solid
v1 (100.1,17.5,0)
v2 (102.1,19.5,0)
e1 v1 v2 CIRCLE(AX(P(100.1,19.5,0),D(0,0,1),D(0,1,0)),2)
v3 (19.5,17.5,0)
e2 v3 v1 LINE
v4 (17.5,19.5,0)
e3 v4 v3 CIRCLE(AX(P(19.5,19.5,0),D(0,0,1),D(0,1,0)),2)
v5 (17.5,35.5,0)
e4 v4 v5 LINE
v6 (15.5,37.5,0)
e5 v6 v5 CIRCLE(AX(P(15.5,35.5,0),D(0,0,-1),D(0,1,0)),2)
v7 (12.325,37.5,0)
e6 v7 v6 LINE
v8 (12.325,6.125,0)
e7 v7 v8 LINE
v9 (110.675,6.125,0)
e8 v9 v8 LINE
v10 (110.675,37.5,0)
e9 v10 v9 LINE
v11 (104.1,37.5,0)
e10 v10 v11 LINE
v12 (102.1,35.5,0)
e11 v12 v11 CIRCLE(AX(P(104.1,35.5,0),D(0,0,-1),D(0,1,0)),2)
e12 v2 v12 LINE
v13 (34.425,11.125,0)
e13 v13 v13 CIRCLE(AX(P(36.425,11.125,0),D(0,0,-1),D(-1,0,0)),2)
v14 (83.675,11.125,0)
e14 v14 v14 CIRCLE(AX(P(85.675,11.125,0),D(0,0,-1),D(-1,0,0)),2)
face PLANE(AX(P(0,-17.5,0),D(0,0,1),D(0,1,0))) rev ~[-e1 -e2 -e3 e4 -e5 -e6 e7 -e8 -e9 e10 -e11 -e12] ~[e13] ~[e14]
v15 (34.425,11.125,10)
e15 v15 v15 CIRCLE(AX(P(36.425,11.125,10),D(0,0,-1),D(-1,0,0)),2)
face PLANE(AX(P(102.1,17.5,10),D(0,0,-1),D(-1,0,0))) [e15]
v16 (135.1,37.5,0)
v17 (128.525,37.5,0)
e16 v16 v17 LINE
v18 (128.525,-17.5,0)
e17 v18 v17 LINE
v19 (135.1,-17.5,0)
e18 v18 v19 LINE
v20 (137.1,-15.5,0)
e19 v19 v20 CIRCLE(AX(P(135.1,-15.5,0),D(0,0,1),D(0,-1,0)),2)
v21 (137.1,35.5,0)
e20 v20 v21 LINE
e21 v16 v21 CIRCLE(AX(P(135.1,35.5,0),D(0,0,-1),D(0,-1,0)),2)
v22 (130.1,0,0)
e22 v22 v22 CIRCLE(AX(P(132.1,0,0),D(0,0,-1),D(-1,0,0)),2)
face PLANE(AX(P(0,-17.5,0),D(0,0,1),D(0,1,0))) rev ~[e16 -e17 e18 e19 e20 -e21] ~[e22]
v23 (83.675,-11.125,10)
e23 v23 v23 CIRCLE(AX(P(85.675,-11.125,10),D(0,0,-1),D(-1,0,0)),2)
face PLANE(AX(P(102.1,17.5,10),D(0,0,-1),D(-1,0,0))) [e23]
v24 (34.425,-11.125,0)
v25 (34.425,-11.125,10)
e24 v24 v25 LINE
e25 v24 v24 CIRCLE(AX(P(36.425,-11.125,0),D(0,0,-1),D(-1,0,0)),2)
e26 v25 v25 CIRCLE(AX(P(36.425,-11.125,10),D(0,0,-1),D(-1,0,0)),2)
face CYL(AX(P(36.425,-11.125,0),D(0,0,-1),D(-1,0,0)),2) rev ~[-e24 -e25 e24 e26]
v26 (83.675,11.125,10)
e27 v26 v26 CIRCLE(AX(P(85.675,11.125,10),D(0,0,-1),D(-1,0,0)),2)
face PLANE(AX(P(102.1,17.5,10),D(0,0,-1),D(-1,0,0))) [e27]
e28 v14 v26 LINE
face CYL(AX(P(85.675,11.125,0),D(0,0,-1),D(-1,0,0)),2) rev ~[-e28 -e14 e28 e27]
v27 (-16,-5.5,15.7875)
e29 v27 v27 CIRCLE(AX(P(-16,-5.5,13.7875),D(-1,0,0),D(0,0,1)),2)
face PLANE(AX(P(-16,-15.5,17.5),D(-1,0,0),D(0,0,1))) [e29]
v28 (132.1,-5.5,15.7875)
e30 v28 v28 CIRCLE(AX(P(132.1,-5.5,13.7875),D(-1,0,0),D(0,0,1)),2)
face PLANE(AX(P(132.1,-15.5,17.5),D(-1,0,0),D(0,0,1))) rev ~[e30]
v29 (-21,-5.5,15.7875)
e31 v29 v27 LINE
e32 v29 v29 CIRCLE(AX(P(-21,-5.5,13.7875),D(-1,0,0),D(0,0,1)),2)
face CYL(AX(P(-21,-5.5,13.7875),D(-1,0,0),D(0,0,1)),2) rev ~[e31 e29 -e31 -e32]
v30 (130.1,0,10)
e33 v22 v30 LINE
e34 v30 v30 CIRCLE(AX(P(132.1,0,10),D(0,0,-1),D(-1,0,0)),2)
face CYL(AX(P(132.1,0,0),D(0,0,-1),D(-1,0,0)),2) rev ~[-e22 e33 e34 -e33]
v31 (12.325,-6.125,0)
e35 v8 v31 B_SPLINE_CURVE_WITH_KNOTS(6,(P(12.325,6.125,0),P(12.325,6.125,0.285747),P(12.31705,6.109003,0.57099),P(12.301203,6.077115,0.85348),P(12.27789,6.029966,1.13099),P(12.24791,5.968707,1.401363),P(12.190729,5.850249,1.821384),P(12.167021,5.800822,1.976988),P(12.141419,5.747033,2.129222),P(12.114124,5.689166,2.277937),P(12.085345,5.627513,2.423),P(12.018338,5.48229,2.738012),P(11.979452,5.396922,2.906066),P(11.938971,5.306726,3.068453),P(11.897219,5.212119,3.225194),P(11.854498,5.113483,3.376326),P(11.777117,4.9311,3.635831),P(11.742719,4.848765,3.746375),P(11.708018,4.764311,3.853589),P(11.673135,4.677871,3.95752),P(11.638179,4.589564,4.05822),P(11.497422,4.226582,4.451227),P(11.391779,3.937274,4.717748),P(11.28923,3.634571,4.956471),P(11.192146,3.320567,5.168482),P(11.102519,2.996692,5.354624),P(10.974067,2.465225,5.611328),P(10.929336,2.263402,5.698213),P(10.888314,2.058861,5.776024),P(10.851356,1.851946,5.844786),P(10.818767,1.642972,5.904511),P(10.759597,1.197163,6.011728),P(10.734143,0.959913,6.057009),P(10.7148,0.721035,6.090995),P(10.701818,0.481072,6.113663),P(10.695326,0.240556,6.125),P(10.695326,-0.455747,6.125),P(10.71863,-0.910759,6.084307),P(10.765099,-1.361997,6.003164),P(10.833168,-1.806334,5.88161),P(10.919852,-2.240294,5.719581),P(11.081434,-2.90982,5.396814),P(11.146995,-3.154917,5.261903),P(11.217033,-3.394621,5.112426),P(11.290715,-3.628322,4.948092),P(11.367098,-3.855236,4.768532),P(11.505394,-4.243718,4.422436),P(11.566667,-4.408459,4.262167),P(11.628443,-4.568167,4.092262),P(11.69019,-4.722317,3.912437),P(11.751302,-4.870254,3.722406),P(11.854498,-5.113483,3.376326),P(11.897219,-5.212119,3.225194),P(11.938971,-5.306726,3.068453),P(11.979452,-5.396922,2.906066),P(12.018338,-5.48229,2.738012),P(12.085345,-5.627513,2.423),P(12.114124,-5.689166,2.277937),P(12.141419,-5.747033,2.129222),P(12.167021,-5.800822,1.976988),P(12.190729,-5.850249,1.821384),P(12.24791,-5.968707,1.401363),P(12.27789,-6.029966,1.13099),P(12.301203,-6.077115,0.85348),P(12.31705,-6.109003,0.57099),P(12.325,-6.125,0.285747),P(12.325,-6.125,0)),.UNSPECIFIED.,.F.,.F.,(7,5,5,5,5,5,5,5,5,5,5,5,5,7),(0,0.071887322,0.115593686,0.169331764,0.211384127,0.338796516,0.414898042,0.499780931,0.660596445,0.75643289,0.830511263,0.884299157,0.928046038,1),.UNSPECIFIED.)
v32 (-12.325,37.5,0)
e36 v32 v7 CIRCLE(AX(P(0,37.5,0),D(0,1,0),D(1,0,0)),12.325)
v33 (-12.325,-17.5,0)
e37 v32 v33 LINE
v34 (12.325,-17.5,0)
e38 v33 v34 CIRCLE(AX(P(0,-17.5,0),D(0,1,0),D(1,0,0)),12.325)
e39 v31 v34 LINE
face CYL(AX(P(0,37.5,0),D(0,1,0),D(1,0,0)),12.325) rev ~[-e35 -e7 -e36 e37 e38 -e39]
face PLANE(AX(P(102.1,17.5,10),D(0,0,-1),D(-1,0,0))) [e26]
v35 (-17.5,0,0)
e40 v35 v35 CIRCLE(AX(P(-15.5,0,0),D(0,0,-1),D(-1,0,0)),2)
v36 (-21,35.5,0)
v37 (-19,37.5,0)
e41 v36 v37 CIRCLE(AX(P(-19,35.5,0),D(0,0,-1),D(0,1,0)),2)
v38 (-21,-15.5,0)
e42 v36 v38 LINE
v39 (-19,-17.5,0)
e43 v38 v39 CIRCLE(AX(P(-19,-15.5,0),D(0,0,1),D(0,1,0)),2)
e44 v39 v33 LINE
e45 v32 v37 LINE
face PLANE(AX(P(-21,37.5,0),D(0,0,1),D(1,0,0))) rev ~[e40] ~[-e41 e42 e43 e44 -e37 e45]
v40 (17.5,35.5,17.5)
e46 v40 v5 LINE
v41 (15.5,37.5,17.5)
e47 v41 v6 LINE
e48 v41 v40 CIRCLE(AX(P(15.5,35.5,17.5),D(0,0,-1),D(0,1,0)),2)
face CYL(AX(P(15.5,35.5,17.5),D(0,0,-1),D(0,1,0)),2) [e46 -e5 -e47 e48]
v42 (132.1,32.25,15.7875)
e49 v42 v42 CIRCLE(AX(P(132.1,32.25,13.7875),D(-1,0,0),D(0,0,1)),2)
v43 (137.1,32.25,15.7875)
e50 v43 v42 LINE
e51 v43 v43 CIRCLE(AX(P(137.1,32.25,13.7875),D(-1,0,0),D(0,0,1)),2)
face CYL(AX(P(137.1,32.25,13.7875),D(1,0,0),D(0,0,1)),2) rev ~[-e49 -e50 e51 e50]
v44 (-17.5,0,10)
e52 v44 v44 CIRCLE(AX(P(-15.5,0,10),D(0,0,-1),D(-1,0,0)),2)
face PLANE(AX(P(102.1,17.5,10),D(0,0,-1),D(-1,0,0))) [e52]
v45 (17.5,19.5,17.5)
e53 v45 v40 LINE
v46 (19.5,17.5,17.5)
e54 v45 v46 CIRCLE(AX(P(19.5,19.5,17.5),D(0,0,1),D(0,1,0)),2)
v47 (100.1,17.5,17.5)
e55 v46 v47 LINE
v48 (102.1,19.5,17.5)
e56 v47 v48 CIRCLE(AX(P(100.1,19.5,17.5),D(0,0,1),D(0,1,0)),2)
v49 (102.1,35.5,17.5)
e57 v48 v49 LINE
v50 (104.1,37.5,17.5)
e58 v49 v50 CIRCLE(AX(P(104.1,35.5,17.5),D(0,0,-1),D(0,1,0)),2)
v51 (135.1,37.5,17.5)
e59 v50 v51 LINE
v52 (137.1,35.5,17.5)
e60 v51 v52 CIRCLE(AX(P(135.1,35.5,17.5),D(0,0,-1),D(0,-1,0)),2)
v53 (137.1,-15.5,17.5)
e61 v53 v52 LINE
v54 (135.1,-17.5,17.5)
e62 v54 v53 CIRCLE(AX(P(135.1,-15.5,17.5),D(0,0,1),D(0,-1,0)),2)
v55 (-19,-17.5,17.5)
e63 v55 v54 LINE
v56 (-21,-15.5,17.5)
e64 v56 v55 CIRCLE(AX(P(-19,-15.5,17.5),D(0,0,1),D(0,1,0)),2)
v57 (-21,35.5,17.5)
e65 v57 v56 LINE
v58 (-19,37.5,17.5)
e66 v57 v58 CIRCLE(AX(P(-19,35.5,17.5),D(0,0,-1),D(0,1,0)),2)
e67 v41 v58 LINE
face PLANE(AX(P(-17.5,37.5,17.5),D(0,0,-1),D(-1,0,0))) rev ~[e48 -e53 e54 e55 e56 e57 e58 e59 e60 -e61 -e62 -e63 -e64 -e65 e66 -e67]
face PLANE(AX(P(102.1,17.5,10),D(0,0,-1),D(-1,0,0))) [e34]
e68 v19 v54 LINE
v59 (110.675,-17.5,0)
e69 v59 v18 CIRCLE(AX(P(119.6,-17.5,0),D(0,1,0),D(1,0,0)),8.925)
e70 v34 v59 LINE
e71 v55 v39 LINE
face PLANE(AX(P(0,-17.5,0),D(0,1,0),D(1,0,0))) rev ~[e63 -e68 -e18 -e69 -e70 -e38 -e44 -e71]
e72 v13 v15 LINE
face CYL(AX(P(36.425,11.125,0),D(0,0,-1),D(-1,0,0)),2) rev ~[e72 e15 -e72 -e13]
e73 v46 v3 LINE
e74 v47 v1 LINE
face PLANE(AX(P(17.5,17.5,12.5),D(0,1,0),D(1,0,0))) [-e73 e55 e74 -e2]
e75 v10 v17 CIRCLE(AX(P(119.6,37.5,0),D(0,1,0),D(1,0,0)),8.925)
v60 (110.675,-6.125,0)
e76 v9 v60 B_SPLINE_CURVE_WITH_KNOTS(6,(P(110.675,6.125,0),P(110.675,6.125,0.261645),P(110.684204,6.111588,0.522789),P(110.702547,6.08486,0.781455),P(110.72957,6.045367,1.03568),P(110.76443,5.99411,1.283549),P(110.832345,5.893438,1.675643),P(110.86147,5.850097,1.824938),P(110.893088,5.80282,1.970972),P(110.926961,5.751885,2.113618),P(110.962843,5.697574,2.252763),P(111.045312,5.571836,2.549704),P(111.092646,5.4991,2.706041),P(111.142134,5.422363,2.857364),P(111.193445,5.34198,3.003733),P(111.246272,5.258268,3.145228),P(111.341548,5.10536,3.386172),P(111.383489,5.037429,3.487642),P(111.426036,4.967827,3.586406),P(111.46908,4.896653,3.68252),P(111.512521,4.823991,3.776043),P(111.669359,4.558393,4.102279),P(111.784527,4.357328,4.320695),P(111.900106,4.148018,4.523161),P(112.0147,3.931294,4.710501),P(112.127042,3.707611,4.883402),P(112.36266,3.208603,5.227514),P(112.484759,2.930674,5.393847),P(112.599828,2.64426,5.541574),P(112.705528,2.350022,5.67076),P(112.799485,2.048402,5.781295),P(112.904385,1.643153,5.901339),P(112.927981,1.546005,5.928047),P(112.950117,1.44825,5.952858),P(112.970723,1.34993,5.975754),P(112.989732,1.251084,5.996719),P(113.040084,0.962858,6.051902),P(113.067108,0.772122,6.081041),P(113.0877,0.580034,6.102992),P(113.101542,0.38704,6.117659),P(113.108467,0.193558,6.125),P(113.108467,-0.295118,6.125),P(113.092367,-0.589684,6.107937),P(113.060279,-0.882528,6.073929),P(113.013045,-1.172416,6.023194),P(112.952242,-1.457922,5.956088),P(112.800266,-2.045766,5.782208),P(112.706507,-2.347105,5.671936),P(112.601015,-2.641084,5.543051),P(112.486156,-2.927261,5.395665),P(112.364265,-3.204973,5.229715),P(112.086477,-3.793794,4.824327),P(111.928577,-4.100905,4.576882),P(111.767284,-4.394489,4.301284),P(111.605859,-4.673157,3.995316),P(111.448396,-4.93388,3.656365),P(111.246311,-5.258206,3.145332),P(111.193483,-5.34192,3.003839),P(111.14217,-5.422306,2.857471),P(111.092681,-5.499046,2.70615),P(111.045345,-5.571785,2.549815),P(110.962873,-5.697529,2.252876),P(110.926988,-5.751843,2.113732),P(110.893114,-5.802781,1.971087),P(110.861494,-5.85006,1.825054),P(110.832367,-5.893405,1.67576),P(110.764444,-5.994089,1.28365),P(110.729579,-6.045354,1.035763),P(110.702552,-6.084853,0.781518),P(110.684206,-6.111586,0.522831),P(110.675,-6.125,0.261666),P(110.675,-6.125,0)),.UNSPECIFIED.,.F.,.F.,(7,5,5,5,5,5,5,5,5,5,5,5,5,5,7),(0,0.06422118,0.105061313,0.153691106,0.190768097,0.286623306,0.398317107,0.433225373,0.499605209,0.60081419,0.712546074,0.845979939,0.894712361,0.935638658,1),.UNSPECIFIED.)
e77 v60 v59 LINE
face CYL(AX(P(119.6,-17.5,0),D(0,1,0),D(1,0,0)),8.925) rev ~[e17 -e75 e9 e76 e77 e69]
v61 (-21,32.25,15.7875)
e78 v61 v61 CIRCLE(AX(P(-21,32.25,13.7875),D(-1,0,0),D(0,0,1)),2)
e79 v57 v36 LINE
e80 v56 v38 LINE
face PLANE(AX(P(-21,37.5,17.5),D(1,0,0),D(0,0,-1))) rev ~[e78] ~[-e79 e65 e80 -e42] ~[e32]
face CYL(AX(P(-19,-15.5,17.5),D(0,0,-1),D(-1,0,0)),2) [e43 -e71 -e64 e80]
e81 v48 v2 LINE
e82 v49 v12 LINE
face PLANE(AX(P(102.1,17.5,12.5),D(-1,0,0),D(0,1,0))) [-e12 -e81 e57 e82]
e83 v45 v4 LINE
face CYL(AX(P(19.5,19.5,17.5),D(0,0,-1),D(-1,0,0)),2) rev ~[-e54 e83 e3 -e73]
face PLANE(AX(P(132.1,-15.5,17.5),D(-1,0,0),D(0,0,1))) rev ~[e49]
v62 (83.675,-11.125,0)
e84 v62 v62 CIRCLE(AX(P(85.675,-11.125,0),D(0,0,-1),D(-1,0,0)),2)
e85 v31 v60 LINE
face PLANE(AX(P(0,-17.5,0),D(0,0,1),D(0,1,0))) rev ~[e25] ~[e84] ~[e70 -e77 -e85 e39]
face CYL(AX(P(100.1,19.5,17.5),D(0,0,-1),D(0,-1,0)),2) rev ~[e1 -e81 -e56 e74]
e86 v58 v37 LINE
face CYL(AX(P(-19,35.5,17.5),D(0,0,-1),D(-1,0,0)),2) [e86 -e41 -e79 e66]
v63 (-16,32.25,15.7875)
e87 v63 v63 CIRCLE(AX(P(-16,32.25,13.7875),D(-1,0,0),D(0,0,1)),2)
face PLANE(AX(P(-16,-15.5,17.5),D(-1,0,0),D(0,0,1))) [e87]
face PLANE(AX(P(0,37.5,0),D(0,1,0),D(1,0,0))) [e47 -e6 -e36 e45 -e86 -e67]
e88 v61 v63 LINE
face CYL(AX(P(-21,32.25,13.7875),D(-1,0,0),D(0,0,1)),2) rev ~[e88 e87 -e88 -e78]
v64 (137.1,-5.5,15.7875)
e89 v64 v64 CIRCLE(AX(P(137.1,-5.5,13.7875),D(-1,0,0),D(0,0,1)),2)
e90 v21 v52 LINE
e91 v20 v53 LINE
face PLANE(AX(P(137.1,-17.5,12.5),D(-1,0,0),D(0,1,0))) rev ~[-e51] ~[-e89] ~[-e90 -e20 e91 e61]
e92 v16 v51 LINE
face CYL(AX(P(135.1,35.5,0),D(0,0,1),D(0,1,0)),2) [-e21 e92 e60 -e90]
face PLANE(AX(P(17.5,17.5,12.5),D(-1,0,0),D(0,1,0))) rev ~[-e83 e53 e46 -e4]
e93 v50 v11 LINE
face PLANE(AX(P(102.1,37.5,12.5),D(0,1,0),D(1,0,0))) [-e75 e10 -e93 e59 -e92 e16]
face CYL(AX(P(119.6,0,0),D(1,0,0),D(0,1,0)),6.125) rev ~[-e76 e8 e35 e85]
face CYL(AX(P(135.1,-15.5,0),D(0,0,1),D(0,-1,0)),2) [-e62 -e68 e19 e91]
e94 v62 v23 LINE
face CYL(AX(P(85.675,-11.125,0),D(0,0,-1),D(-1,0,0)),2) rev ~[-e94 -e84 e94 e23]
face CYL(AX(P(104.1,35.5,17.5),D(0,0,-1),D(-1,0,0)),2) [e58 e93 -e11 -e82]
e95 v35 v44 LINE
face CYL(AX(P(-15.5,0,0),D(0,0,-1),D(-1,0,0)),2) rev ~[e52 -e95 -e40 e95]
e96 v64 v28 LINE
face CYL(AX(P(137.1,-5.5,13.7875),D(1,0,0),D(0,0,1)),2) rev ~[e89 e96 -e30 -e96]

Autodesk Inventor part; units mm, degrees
ref_plane "YZ Plane" through (0, 0, 0) normal (1, 0, 0) x (0, 1, 0)
ref_plane "XZ Plane" through (0, 0, 0) normal (0, 1, 0) x (-1, 0, 0)
ref_plane "XY Plane" through (0, 0, 0) normal (0, 0, 1) x (1, 0, 0)
sketch "Sketch1" plane through (0, 0, 0) normal (0, 0, 1) x (1, 0, 0)
  line L0 (0, 0) -> (119.6, 0)
  line L1 (119.6, 0) -> (119.6, 150)
  line L2 (119.6, 150) -> (0, 150)
  line L3 (0, 150) -> (0, 0)
  dimension "d0" = 119.6
  dimension "d1" = 150
sketch "Sketch2" plane through (0, 0, 0) normal (1, 0, 0) x (0, 1, 0)
  circle A0 centre (0, 0) radius 12.5
  circle A1 centre (0, 0) radius 6.125
  line L0 (-12.5, 0) -> (12.5, 0)
  line L1 (12.5, 0) -> (12.5, 12.5)
  line L2 (12.5, 12.5) -> (-12.5, 12.5)
  line L3 (-12.5, 12.5) -> (-12.5, 0)
  circle A2 centre (150, 0) radius 12.5
  circle A3 centre (150, 0) radius 6.125
  line L4 (137.5, 0) -> (162.5, 0)
  line L5 (162.5, 0) -> (162.5, 12.5)
  line L6 (162.5, 12.5) -> (137.5, 12.5)
  line L7 (137.5, 12.5) -> (137.5, 0)
  line L8 (-12.5, 12.5) -> (-17.5, 12.5)
  line L9 (-17.5, 12.5) -> (-17.5, 0)
  line L10 (-17.5, 0) -> (-12.5, 0)
  line L11 (-12.5, 0) -> (-12.5, 12.5)
  line L12 (12.5, 12.5) -> (17.5, 12.5)
  line L13 (17.5, 12.5) -> (17.5, 0)
  line L14 (17.5, 0) -> (12.5, 0)
  line L15 (12.5, 0) -> (12.5, 12.5)
  point P0 (6.125, 0)
  point P1 (-6.125, 0)
  point P2 (150, 0)
  point P3 (12.5, 0)
  dimension "d2" = 25
  dimension "d3" = 12.25
  dimension "d6" = 5
  dimension "d7" = 5
  dimension "d8" = 35
extrude "Extrusion1" add sketch "Sketch2" along normal up to surface (119.6 mm away) contours L3 L2 A0 | A0 L0 A1 | L10 L9 L8 L3 | A0 L2 L1 | L1 L12 L13 L14 | A1 L0 picked at (10.2705, 0.9272) picked at (1.5282, 2.3311)
ref_plane "Work Plane1" through (59.8, 0, 0) normal (-1, 0, 0) x (0, 0, 1)
sketch "Sketch3" plane through (0, -17.5, 0) normal (0, -1, 0) x (1, 0, 0)
  line L0 (0, 12.5) -> (119.6, 12.5) projected
  line L1 (102.1, 12.5) -> (137.1, 12.5)
  line L2 (137.1, 12.5) -> (137.1, 0)
  line L3 (137.1, 0) -> (102.1, 0)
  line L4 (102.1, 0) -> (102.1, 12.5)
  line L5 (119.6, 12.5) -> (119.6, 0) projected
  circle A0 centre (119.6, 0) radius 8.925
  point P0 (0, 0)
  point P1 (119.6, 12.5)
  point P2 (128.525, 0)
  point P3 (110.675, 0)
  dimension "d9" = 35
  dimension "d33" = 17.85
extrude "Extrusion2" add sketch "Sketch3" against normal blind 55 contours L0 L5 A0 L3 L4 | L1 L2 L3 A0 L5 | A0 L3 L5 | L5 L3 A0
extrude "Extrusion4" cut sketch "Sketch3" along normal through all both and the other way through all contours A0 L3 L5 | L5 L3 A0
extrude "Extrusion3" cut sketch "Sketch2" along normal up to surface (119.6 mm away) contours A1 L0 picked at (1.5282, 2.3311)
mirror "Mirror1" about plane through (59.8, 0, 0) normal (-1, 0, 0) of "Extrusion2", "Extrusion4", "Extrusion3"
sketch "Sketch4" plane through (102.1, 17.5, 12.5) normal (0, 0, 1) x (1, 0, 0)
  line L0 (-119.6, -35) -> (35, -35) projected
  line L1 (0, 20) -> (35, 20) projected
  line L2 (0, 0) -> (0, 20) projected
  line L3 (-84.6, 0) -> (0, 0) projected
  line L4 (-84.6, 0) -> (-84.6, 20) projected
  line L5 (-84.6, 20) -> (-119.6, 20) projected
  line L6 (35, -35) -> (35, 20) projected
  line L7 (-119.6, -35) -> (-119.6, 20) projected
  point P0 (-102.1, -17.5)
extrude "Extrusion5" add sketch "Sketch4" along normal blind 5
sketch "Sketch5" plane through (102.1, 17.5, 0) normal (0, 0, -1) x (-1, 0, 0)
  circle A0 centre (16.425, -6.375) radius 2
  line L0 (-8.575, -11.375) -> (93.175, -11.375) projected
  line L1 (-8.575, 20) -> (-8.575, -11.375) projected
  circle A1 centre (65.675, -6.375) radius 2
  circle A2 centre (16.425, -28.625) radius 2
  circle A3 centre (65.675, -28.625) radius 2
  line L2 (93.175, -35) -> (93.175, -23.625) projected
  line L3 (93.175, -23.625) -> (-8.575, -23.625) projected
  circle A4 centre (-30, -17.5) radius 2
  circle A5 centre (117.6, -17.5) radius 2
  line L4 (-35, -35) -> (-35, 20) projected
  line L5 (119.6, -35) -> (119.6, 20) projected
  line L6 (16.425, -6.375) -> (16.425, -28.625) construction
  point P0 (102.1, -17.5)
  point P1 (16.425, -17.5)
  dimension "d18" = 4
  dimension "d19" = 5
  dimension "d20" = 25
  dimension "d23" = 49.25
  dimension "d26" = 22.25
  dimension "d29" = 27.5
  dimension "d30" = 5
  dimension "d38" = 5
  dimension "d39" = 2
extrude "Extrusion6" cut sketch "Sketch5" against normal blind 10
sketch "Sketch6" plane through (0, 37.5, 0) normal (0, 1, 0) x (1, 0, 0)
  circle A0 centre (0, 0) radius 12.325
  line L0 (-17.5, 0) -> (-17.5, -17.5) projected
  line L1 (-17.5, -17.5) -> (-21, -17.5)
  line L2 (-21, -17.5) -> (-21, 0)
  line L3 (-21, 0) -> (-17.5, 0)
  line L4 (-17.5, 0) -> (-17.5, -17.5)
  line L5 (-17.5, 0) -> (-8.925, 0) projected
  dimension "d34" = 24.65
  dimension "d40" = 3.5
extrude "Extrusion7" cut sketch "Sketch6" against normal through all contours A0
extrude "Extrusion8" add sketch "Sketch6" against normal up to surface (55 mm away) contours L0 L1 L2 L3
fillet "Fillet1" radius 2 8 edges at (102.1, 17.5, 8.75) (17.5, 17.5, 8.75) (17.5, 37.5, 8.75) (102.1, 37.5, 8.75) (137.1, 37.5, 8.75) (137.1, -17.5, 8.75) (-21, 37.5, 8.75) (-21, -17.5, 8.75)
sketch "Sketch7" plane through (-21, -15.5, 17.5) normal (-1, 0, 0) x (0, 0, 1)
  circle A0 centre (-3.7125, 10) radius 2
  line L0 (0, 51) -> (0, 0) projected
  line L1 (-17.5, -2) -> (0, -2) projected
  circle A1 centre (-3.7125, 47.75) radius 2
  point P0 (-17.5, 15.5)
  dimension "d43" = 4
  dimension "d44" = 3.7125
  dimension "d45" = 12
  dimension "d49" = 37.75
extrude "Extrusion9" cut sketch "Sketch7" against normal blind 5
extrude "Extrusion10" cut sketch "Sketch7" along normal blind 5 from surface at -158.1
equation "\"d7\" = d6"
equation "\"d9\" = d8"
properties part number "BottomBase"
